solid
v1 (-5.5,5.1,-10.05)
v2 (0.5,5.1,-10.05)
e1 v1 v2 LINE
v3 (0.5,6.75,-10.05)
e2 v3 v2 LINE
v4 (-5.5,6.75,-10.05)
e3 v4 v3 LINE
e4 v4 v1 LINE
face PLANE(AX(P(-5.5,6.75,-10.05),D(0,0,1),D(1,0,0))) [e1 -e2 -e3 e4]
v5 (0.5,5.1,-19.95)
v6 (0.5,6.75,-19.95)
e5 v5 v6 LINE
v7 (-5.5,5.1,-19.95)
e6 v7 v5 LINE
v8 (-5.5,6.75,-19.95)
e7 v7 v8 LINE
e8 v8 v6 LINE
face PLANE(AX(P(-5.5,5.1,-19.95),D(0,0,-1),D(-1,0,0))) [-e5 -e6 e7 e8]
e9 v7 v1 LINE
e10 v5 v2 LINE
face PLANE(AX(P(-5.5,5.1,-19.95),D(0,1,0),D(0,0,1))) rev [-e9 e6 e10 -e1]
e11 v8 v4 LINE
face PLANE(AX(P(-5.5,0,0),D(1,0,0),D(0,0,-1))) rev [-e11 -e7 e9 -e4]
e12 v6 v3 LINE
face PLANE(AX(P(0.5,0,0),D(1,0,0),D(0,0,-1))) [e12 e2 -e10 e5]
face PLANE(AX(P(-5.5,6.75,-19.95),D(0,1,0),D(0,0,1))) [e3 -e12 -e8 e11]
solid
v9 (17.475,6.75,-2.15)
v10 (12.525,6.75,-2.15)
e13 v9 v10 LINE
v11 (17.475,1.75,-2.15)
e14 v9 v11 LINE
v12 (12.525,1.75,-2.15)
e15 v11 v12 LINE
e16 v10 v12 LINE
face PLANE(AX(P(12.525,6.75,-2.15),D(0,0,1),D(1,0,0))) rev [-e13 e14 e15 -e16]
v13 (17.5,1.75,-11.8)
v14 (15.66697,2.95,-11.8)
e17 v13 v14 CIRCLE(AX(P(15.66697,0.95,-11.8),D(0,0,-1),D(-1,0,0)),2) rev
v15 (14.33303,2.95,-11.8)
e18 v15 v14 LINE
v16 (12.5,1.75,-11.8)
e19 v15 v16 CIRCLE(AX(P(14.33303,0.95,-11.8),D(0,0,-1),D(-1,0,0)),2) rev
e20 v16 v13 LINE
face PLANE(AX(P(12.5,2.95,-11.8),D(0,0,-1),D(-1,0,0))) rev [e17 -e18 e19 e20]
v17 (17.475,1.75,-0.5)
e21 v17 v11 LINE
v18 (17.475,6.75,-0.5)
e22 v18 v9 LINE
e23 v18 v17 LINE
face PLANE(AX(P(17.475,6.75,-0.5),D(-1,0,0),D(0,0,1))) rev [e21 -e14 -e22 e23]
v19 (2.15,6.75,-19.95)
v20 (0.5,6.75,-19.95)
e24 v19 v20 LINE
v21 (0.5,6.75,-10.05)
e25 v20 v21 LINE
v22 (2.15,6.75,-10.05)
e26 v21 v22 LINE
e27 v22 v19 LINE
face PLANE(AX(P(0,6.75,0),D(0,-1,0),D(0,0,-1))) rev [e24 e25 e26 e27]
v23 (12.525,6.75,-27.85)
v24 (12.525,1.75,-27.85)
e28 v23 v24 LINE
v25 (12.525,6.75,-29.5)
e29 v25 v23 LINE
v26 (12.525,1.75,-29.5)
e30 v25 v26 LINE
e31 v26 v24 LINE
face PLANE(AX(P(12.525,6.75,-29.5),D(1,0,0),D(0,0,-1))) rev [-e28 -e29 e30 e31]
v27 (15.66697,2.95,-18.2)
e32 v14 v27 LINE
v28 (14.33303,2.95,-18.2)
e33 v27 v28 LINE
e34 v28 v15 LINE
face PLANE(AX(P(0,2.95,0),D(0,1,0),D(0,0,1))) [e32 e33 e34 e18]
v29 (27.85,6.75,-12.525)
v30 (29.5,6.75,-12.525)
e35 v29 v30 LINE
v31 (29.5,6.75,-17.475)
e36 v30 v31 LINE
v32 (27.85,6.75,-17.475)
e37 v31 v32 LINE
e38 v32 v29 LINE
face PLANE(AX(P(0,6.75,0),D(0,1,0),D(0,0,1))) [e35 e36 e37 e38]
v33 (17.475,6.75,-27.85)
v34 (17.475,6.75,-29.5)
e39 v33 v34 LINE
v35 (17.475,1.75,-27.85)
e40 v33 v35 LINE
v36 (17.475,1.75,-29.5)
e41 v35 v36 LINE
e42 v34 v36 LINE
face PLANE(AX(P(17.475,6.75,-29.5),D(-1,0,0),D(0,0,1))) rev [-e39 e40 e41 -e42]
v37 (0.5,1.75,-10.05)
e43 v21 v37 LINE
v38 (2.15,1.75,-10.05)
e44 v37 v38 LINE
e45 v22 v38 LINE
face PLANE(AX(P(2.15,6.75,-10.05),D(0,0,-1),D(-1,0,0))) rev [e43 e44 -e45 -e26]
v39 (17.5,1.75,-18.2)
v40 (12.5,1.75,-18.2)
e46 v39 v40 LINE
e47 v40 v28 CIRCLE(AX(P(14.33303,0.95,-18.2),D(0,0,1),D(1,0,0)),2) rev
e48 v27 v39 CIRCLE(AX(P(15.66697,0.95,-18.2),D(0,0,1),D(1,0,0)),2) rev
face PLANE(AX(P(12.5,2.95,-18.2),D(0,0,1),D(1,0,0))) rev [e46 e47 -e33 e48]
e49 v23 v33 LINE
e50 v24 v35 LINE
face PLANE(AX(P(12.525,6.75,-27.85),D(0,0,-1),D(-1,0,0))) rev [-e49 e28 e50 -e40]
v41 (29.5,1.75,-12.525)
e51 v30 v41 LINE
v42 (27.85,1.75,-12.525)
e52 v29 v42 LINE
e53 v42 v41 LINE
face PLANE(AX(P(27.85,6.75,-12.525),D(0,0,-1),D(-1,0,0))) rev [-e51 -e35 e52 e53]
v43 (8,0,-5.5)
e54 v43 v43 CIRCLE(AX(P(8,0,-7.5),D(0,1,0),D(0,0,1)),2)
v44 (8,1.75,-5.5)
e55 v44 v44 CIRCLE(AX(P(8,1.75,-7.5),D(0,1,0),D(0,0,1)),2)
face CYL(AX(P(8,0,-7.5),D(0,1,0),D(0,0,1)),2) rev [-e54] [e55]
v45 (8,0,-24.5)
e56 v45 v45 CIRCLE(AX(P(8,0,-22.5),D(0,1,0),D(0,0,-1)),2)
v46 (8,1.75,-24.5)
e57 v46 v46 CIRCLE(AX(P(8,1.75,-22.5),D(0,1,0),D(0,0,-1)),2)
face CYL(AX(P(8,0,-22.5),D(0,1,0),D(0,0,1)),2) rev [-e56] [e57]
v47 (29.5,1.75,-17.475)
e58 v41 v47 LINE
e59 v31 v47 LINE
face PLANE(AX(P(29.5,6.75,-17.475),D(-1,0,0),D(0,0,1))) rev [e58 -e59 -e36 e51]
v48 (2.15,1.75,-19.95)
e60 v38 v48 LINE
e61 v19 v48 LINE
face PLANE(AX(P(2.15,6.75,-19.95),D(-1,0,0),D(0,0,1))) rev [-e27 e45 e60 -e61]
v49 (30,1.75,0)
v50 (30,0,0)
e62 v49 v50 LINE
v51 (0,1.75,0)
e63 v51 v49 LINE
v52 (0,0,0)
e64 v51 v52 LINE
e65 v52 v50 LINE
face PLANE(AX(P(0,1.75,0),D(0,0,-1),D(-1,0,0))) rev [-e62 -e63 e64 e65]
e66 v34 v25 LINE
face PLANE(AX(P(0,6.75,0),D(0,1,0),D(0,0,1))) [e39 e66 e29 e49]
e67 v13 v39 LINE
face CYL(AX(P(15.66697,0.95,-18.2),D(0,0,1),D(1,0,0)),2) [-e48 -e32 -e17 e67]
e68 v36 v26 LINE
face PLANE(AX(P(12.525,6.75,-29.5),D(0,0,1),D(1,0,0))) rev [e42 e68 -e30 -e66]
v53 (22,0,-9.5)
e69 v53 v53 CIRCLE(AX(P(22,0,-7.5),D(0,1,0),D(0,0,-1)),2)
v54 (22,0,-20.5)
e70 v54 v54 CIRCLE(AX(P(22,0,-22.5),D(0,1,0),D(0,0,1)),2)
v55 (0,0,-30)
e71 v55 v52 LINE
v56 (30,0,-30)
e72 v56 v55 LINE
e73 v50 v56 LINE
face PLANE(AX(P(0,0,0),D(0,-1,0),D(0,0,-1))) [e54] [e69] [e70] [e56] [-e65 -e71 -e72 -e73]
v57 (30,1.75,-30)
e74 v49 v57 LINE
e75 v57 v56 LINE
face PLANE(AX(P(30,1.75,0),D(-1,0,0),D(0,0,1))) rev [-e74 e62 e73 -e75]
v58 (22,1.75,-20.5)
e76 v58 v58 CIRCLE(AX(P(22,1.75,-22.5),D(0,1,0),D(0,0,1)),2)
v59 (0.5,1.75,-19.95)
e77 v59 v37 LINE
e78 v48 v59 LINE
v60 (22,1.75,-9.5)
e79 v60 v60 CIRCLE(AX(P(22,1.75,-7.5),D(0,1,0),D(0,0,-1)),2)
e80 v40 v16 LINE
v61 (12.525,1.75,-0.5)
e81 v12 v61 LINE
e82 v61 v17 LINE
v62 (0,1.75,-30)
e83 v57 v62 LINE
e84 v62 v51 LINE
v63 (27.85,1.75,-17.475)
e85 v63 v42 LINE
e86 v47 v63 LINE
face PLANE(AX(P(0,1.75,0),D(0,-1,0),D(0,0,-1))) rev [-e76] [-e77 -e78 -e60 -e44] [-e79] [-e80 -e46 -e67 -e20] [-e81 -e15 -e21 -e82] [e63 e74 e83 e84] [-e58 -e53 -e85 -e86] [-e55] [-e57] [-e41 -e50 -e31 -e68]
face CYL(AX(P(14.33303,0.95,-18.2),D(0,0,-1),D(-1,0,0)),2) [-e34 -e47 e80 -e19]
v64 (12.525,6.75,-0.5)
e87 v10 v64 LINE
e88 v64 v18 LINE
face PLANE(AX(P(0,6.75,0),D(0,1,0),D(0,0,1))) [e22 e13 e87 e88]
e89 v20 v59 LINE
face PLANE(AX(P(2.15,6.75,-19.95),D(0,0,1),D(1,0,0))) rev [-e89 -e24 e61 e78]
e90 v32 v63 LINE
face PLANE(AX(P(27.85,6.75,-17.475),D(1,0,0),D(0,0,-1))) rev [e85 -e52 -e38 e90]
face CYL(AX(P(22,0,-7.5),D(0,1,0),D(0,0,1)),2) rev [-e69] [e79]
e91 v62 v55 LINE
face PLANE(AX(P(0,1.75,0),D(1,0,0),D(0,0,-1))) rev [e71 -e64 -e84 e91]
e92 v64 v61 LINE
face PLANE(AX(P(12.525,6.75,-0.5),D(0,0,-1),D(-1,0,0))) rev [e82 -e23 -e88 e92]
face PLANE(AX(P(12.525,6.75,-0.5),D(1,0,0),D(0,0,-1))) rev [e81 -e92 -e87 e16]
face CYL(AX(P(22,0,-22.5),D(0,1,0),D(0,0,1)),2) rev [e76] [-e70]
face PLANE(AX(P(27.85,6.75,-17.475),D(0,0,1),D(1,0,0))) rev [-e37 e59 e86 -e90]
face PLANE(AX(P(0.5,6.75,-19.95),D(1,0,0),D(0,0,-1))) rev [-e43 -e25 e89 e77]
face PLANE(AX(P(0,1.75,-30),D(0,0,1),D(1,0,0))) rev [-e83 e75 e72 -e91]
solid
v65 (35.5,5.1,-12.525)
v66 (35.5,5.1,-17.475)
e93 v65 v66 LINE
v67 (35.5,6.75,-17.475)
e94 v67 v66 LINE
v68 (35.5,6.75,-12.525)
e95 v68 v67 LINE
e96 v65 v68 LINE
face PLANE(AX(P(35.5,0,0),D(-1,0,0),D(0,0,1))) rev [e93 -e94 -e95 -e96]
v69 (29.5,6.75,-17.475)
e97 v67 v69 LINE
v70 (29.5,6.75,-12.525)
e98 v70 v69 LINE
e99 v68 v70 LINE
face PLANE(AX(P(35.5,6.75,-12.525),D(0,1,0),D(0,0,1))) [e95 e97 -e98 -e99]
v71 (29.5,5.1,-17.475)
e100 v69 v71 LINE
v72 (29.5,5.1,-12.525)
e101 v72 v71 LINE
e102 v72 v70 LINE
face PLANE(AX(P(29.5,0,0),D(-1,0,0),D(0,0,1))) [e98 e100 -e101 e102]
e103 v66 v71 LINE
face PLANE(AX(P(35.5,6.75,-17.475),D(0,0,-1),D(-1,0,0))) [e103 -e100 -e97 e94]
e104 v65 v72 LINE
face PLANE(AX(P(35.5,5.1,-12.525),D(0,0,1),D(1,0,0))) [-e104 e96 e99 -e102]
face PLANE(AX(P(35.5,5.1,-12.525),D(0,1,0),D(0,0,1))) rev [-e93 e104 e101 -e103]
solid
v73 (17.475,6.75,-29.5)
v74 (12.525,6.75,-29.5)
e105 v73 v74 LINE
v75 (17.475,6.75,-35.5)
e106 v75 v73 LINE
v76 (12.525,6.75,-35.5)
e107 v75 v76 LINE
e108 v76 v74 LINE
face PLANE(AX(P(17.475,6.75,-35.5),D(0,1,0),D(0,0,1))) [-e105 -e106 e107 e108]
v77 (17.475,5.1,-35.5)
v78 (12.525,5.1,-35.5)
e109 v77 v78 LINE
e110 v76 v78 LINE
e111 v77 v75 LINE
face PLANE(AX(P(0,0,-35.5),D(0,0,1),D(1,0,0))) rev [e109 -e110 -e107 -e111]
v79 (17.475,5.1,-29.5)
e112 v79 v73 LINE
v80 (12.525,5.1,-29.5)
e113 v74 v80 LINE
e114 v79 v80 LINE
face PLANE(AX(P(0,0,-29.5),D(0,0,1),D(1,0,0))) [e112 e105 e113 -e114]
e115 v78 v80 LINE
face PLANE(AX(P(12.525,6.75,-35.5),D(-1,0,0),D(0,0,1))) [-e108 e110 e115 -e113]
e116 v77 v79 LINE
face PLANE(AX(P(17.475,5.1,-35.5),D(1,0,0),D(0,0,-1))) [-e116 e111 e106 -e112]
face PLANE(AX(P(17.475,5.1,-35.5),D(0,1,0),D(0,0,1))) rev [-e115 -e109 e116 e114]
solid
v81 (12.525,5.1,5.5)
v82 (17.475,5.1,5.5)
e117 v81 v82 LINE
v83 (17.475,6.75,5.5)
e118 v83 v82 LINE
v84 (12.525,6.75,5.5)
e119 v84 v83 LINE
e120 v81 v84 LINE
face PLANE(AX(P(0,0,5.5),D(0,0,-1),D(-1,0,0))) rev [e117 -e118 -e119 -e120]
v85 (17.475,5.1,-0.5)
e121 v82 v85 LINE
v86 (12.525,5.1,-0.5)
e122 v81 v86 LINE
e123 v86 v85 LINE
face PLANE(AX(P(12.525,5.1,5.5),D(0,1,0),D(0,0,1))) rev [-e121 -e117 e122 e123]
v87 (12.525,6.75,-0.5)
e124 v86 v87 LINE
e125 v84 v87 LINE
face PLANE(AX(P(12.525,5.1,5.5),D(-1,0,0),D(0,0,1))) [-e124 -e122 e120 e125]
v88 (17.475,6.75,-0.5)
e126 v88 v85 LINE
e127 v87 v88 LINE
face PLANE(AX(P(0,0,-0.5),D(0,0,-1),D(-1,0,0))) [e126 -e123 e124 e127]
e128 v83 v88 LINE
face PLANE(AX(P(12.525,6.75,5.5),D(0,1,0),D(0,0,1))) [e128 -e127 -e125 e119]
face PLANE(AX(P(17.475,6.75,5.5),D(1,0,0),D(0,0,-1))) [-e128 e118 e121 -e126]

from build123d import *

# Parameters (mm, degrees)
SKETCH1_W           = 30
SKETCH1_H           = 30
BOSS_EXTRUDE1_DEPTH = 1.75
SKETCH2_R           = 2
CUT_EXTRUDE1_DEPTH  = 1.75
SKETCH3_W           = 5
SKETCH3_H           = 6.4
BOSS_EXTRUDE2_DEPTH = 1.2
FILLET1_R           = 2
SKETCH4_W           = 1.65
SKETCH4_H           = 4.95
SKETCH4_H_2         = 9.9
SKETCH4_W_2         = 4.95
SKETCH4_H_3         = 1.65
BOSS_EXTRUDE3_DEPTH = 5
SKETCH5_W           = 4.95
SKETCH5_H           = 1.65
BASE_FLANGE1_DEPTH  = 6
SKETCH10_W          = 4.95
SKETCH10_H          = 1.65
BASE_FLANGE2_DEPTH  = 6
SKETCH13_W          = 4.95
SKETCH13_H          = 1.65
BASE_FLANGE3_DEPTH  = 6
SKETCH16_W          = 9.9
SKETCH16_H          = 1.65
BASE_FLANGE4_DEPTH  = 6


# Sheet-metal steps are written as plain solids
with BuildPart() as part:
    # Sketch1 → Boss-Extrude1 (new body)
    with BuildSketch(Plane(origin=(0, 0, 0), x_dir=(1, 0, 0), z_dir=(0, 1, 0))):
        with Locations((15, 15)):
            Rectangle(SKETCH1_W, SKETCH1_H)
    extrude(amount=BOSS_EXTRUDE1_DEPTH)

    # Sketch2 → Cut-Extrude1 (cut)
    with BuildSketch(Plane(origin=(0, 1.75, 0), x_dir=(1, 0, 0), z_dir=(0, 1, 0))):
        with Locations(Location((22, 22.5, 0), (0, 0, 270))):
            Circle(SKETCH2_R)
        with Locations(Location((22, 7.5, 0), (0, 0, 90))):
            Circle(SKETCH2_R)
        with Locations(Location((8, 22.5, 0), (0, 0, 90))):
            Circle(SKETCH2_R)
        with Locations(Location((8, 7.5, 0), (0, 0, 270))):
            Circle(SKETCH2_R)
    extrude(amount=-CUT_EXTRUDE1_DEPTH, mode=Mode.SUBTRACT)

    # Sketch3 → Boss-Extrude2 (add)
    with BuildSketch(Plane(origin=(0, 1.75, 0), x_dir=(1, 0, 0), z_dir=(0, 1, 0))):
        with Locations((15, 15)):
            Rectangle(SKETCH3_W, SKETCH3_H)
    extrude(amount=BOSS_EXTRUDE2_DEPTH)

    # Fillet1
    # the kernel refuses this fillet: 2 mm, written as the material it takes off along each edge
    with BuildSketch(Plane(origin=(17.5, 2.95, -22.782575695), x_dir=(0, -1, 0), z_dir=(0, 0, 1)), Plane(origin=(12.5, 2.95, -7.217424305), x_dir=(0, -1, 0), z_dir=(0, 0, -1))) as fillet1_piece_1:
        with BuildLine():
            CenterArc((2, -1.833030278), FILLET1_R, 113.578178478, 66.421821522)
            Line((0, -1.833030278), (-0.04, -1.833030278))
            Line((-0.04, -1.833030278), (-0.04, 0))
            Line((-0.04, 0), (0, 0.04))
            ThreePointArc((0, 0.04), (0.6, 0.04), (1.184, 0.036660606))
            Line((1.184, 0.036660606), (1.2, 0))
        make_face()
    extrude(amount=15.56515139, mode=Mode.SUBTRACT)

    # Sketch4 → Boss-Extrude3 (add)
    with BuildSketch(Plane(origin=(0, 1.75, 0), x_dir=(1, 0, 0), z_dir=(0, 1, 0))):
        with Locations((28.675, 15)):
            Rectangle(SKETCH4_W, SKETCH4_H)
        with Locations((1.325, 15)):
            Rectangle(SKETCH4_W, SKETCH4_H_2)
        with Locations((15, 1.325)):
            Rectangle(SKETCH4_W_2, SKETCH4_H_3)
        with Locations((15, 28.675)):
            Rectangle(SKETCH4_W_2, SKETCH4_H_3)
    extrude(amount=BOSS_EXTRUDE3_DEPTH)


with BuildPart() as body_2:
    # Sketch5 → Base-Flange1 (new body)
    with BuildSketch(Plane.XY.offset(-0.5)):
        with Locations((15, 5.925)):
            Rectangle(SKETCH5_W, SKETCH5_H)
    extrude(amount=BASE_FLANGE1_DEPTH)


with BuildPart() as body_3:
    # Sketch10 → Base-Flange2 (new body)
    with BuildSketch(Plane(origin=(29.5, 0, 0), x_dir=(0, 0, -1), z_dir=(1, 0, 0))):
        with Locations((15, 5.925)):
            Rectangle(SKETCH10_W, SKETCH10_H)
    extrude(amount=BASE_FLANGE2_DEPTH)


with BuildPart() as body_4:
    # Sketch13 → Base-Flange3 (new body)
    with BuildSketch(Plane(origin=(0, 0, -29.5), x_dir=(-1, 0, 0), z_dir=(0, 0, -1))):
        with Locations((-15, 5.925)):
            Rectangle(SKETCH13_W, SKETCH13_H)
    extrude(amount=BASE_FLANGE3_DEPTH)


with BuildPart() as body_5:
    # Sketch16 → Base-Flange4 (new body)
    with BuildSketch(Plane.ZY.offset(-0.5)):
        with Locations((-15, 5.925)):
            Rectangle(SKETCH16_W, SKETCH16_H)
    extrude(amount=BASE_FLANGE4_DEPTH)


solid = Compound([part.part, body_2.part, body_3.part, body_4.part, body_5.part])
